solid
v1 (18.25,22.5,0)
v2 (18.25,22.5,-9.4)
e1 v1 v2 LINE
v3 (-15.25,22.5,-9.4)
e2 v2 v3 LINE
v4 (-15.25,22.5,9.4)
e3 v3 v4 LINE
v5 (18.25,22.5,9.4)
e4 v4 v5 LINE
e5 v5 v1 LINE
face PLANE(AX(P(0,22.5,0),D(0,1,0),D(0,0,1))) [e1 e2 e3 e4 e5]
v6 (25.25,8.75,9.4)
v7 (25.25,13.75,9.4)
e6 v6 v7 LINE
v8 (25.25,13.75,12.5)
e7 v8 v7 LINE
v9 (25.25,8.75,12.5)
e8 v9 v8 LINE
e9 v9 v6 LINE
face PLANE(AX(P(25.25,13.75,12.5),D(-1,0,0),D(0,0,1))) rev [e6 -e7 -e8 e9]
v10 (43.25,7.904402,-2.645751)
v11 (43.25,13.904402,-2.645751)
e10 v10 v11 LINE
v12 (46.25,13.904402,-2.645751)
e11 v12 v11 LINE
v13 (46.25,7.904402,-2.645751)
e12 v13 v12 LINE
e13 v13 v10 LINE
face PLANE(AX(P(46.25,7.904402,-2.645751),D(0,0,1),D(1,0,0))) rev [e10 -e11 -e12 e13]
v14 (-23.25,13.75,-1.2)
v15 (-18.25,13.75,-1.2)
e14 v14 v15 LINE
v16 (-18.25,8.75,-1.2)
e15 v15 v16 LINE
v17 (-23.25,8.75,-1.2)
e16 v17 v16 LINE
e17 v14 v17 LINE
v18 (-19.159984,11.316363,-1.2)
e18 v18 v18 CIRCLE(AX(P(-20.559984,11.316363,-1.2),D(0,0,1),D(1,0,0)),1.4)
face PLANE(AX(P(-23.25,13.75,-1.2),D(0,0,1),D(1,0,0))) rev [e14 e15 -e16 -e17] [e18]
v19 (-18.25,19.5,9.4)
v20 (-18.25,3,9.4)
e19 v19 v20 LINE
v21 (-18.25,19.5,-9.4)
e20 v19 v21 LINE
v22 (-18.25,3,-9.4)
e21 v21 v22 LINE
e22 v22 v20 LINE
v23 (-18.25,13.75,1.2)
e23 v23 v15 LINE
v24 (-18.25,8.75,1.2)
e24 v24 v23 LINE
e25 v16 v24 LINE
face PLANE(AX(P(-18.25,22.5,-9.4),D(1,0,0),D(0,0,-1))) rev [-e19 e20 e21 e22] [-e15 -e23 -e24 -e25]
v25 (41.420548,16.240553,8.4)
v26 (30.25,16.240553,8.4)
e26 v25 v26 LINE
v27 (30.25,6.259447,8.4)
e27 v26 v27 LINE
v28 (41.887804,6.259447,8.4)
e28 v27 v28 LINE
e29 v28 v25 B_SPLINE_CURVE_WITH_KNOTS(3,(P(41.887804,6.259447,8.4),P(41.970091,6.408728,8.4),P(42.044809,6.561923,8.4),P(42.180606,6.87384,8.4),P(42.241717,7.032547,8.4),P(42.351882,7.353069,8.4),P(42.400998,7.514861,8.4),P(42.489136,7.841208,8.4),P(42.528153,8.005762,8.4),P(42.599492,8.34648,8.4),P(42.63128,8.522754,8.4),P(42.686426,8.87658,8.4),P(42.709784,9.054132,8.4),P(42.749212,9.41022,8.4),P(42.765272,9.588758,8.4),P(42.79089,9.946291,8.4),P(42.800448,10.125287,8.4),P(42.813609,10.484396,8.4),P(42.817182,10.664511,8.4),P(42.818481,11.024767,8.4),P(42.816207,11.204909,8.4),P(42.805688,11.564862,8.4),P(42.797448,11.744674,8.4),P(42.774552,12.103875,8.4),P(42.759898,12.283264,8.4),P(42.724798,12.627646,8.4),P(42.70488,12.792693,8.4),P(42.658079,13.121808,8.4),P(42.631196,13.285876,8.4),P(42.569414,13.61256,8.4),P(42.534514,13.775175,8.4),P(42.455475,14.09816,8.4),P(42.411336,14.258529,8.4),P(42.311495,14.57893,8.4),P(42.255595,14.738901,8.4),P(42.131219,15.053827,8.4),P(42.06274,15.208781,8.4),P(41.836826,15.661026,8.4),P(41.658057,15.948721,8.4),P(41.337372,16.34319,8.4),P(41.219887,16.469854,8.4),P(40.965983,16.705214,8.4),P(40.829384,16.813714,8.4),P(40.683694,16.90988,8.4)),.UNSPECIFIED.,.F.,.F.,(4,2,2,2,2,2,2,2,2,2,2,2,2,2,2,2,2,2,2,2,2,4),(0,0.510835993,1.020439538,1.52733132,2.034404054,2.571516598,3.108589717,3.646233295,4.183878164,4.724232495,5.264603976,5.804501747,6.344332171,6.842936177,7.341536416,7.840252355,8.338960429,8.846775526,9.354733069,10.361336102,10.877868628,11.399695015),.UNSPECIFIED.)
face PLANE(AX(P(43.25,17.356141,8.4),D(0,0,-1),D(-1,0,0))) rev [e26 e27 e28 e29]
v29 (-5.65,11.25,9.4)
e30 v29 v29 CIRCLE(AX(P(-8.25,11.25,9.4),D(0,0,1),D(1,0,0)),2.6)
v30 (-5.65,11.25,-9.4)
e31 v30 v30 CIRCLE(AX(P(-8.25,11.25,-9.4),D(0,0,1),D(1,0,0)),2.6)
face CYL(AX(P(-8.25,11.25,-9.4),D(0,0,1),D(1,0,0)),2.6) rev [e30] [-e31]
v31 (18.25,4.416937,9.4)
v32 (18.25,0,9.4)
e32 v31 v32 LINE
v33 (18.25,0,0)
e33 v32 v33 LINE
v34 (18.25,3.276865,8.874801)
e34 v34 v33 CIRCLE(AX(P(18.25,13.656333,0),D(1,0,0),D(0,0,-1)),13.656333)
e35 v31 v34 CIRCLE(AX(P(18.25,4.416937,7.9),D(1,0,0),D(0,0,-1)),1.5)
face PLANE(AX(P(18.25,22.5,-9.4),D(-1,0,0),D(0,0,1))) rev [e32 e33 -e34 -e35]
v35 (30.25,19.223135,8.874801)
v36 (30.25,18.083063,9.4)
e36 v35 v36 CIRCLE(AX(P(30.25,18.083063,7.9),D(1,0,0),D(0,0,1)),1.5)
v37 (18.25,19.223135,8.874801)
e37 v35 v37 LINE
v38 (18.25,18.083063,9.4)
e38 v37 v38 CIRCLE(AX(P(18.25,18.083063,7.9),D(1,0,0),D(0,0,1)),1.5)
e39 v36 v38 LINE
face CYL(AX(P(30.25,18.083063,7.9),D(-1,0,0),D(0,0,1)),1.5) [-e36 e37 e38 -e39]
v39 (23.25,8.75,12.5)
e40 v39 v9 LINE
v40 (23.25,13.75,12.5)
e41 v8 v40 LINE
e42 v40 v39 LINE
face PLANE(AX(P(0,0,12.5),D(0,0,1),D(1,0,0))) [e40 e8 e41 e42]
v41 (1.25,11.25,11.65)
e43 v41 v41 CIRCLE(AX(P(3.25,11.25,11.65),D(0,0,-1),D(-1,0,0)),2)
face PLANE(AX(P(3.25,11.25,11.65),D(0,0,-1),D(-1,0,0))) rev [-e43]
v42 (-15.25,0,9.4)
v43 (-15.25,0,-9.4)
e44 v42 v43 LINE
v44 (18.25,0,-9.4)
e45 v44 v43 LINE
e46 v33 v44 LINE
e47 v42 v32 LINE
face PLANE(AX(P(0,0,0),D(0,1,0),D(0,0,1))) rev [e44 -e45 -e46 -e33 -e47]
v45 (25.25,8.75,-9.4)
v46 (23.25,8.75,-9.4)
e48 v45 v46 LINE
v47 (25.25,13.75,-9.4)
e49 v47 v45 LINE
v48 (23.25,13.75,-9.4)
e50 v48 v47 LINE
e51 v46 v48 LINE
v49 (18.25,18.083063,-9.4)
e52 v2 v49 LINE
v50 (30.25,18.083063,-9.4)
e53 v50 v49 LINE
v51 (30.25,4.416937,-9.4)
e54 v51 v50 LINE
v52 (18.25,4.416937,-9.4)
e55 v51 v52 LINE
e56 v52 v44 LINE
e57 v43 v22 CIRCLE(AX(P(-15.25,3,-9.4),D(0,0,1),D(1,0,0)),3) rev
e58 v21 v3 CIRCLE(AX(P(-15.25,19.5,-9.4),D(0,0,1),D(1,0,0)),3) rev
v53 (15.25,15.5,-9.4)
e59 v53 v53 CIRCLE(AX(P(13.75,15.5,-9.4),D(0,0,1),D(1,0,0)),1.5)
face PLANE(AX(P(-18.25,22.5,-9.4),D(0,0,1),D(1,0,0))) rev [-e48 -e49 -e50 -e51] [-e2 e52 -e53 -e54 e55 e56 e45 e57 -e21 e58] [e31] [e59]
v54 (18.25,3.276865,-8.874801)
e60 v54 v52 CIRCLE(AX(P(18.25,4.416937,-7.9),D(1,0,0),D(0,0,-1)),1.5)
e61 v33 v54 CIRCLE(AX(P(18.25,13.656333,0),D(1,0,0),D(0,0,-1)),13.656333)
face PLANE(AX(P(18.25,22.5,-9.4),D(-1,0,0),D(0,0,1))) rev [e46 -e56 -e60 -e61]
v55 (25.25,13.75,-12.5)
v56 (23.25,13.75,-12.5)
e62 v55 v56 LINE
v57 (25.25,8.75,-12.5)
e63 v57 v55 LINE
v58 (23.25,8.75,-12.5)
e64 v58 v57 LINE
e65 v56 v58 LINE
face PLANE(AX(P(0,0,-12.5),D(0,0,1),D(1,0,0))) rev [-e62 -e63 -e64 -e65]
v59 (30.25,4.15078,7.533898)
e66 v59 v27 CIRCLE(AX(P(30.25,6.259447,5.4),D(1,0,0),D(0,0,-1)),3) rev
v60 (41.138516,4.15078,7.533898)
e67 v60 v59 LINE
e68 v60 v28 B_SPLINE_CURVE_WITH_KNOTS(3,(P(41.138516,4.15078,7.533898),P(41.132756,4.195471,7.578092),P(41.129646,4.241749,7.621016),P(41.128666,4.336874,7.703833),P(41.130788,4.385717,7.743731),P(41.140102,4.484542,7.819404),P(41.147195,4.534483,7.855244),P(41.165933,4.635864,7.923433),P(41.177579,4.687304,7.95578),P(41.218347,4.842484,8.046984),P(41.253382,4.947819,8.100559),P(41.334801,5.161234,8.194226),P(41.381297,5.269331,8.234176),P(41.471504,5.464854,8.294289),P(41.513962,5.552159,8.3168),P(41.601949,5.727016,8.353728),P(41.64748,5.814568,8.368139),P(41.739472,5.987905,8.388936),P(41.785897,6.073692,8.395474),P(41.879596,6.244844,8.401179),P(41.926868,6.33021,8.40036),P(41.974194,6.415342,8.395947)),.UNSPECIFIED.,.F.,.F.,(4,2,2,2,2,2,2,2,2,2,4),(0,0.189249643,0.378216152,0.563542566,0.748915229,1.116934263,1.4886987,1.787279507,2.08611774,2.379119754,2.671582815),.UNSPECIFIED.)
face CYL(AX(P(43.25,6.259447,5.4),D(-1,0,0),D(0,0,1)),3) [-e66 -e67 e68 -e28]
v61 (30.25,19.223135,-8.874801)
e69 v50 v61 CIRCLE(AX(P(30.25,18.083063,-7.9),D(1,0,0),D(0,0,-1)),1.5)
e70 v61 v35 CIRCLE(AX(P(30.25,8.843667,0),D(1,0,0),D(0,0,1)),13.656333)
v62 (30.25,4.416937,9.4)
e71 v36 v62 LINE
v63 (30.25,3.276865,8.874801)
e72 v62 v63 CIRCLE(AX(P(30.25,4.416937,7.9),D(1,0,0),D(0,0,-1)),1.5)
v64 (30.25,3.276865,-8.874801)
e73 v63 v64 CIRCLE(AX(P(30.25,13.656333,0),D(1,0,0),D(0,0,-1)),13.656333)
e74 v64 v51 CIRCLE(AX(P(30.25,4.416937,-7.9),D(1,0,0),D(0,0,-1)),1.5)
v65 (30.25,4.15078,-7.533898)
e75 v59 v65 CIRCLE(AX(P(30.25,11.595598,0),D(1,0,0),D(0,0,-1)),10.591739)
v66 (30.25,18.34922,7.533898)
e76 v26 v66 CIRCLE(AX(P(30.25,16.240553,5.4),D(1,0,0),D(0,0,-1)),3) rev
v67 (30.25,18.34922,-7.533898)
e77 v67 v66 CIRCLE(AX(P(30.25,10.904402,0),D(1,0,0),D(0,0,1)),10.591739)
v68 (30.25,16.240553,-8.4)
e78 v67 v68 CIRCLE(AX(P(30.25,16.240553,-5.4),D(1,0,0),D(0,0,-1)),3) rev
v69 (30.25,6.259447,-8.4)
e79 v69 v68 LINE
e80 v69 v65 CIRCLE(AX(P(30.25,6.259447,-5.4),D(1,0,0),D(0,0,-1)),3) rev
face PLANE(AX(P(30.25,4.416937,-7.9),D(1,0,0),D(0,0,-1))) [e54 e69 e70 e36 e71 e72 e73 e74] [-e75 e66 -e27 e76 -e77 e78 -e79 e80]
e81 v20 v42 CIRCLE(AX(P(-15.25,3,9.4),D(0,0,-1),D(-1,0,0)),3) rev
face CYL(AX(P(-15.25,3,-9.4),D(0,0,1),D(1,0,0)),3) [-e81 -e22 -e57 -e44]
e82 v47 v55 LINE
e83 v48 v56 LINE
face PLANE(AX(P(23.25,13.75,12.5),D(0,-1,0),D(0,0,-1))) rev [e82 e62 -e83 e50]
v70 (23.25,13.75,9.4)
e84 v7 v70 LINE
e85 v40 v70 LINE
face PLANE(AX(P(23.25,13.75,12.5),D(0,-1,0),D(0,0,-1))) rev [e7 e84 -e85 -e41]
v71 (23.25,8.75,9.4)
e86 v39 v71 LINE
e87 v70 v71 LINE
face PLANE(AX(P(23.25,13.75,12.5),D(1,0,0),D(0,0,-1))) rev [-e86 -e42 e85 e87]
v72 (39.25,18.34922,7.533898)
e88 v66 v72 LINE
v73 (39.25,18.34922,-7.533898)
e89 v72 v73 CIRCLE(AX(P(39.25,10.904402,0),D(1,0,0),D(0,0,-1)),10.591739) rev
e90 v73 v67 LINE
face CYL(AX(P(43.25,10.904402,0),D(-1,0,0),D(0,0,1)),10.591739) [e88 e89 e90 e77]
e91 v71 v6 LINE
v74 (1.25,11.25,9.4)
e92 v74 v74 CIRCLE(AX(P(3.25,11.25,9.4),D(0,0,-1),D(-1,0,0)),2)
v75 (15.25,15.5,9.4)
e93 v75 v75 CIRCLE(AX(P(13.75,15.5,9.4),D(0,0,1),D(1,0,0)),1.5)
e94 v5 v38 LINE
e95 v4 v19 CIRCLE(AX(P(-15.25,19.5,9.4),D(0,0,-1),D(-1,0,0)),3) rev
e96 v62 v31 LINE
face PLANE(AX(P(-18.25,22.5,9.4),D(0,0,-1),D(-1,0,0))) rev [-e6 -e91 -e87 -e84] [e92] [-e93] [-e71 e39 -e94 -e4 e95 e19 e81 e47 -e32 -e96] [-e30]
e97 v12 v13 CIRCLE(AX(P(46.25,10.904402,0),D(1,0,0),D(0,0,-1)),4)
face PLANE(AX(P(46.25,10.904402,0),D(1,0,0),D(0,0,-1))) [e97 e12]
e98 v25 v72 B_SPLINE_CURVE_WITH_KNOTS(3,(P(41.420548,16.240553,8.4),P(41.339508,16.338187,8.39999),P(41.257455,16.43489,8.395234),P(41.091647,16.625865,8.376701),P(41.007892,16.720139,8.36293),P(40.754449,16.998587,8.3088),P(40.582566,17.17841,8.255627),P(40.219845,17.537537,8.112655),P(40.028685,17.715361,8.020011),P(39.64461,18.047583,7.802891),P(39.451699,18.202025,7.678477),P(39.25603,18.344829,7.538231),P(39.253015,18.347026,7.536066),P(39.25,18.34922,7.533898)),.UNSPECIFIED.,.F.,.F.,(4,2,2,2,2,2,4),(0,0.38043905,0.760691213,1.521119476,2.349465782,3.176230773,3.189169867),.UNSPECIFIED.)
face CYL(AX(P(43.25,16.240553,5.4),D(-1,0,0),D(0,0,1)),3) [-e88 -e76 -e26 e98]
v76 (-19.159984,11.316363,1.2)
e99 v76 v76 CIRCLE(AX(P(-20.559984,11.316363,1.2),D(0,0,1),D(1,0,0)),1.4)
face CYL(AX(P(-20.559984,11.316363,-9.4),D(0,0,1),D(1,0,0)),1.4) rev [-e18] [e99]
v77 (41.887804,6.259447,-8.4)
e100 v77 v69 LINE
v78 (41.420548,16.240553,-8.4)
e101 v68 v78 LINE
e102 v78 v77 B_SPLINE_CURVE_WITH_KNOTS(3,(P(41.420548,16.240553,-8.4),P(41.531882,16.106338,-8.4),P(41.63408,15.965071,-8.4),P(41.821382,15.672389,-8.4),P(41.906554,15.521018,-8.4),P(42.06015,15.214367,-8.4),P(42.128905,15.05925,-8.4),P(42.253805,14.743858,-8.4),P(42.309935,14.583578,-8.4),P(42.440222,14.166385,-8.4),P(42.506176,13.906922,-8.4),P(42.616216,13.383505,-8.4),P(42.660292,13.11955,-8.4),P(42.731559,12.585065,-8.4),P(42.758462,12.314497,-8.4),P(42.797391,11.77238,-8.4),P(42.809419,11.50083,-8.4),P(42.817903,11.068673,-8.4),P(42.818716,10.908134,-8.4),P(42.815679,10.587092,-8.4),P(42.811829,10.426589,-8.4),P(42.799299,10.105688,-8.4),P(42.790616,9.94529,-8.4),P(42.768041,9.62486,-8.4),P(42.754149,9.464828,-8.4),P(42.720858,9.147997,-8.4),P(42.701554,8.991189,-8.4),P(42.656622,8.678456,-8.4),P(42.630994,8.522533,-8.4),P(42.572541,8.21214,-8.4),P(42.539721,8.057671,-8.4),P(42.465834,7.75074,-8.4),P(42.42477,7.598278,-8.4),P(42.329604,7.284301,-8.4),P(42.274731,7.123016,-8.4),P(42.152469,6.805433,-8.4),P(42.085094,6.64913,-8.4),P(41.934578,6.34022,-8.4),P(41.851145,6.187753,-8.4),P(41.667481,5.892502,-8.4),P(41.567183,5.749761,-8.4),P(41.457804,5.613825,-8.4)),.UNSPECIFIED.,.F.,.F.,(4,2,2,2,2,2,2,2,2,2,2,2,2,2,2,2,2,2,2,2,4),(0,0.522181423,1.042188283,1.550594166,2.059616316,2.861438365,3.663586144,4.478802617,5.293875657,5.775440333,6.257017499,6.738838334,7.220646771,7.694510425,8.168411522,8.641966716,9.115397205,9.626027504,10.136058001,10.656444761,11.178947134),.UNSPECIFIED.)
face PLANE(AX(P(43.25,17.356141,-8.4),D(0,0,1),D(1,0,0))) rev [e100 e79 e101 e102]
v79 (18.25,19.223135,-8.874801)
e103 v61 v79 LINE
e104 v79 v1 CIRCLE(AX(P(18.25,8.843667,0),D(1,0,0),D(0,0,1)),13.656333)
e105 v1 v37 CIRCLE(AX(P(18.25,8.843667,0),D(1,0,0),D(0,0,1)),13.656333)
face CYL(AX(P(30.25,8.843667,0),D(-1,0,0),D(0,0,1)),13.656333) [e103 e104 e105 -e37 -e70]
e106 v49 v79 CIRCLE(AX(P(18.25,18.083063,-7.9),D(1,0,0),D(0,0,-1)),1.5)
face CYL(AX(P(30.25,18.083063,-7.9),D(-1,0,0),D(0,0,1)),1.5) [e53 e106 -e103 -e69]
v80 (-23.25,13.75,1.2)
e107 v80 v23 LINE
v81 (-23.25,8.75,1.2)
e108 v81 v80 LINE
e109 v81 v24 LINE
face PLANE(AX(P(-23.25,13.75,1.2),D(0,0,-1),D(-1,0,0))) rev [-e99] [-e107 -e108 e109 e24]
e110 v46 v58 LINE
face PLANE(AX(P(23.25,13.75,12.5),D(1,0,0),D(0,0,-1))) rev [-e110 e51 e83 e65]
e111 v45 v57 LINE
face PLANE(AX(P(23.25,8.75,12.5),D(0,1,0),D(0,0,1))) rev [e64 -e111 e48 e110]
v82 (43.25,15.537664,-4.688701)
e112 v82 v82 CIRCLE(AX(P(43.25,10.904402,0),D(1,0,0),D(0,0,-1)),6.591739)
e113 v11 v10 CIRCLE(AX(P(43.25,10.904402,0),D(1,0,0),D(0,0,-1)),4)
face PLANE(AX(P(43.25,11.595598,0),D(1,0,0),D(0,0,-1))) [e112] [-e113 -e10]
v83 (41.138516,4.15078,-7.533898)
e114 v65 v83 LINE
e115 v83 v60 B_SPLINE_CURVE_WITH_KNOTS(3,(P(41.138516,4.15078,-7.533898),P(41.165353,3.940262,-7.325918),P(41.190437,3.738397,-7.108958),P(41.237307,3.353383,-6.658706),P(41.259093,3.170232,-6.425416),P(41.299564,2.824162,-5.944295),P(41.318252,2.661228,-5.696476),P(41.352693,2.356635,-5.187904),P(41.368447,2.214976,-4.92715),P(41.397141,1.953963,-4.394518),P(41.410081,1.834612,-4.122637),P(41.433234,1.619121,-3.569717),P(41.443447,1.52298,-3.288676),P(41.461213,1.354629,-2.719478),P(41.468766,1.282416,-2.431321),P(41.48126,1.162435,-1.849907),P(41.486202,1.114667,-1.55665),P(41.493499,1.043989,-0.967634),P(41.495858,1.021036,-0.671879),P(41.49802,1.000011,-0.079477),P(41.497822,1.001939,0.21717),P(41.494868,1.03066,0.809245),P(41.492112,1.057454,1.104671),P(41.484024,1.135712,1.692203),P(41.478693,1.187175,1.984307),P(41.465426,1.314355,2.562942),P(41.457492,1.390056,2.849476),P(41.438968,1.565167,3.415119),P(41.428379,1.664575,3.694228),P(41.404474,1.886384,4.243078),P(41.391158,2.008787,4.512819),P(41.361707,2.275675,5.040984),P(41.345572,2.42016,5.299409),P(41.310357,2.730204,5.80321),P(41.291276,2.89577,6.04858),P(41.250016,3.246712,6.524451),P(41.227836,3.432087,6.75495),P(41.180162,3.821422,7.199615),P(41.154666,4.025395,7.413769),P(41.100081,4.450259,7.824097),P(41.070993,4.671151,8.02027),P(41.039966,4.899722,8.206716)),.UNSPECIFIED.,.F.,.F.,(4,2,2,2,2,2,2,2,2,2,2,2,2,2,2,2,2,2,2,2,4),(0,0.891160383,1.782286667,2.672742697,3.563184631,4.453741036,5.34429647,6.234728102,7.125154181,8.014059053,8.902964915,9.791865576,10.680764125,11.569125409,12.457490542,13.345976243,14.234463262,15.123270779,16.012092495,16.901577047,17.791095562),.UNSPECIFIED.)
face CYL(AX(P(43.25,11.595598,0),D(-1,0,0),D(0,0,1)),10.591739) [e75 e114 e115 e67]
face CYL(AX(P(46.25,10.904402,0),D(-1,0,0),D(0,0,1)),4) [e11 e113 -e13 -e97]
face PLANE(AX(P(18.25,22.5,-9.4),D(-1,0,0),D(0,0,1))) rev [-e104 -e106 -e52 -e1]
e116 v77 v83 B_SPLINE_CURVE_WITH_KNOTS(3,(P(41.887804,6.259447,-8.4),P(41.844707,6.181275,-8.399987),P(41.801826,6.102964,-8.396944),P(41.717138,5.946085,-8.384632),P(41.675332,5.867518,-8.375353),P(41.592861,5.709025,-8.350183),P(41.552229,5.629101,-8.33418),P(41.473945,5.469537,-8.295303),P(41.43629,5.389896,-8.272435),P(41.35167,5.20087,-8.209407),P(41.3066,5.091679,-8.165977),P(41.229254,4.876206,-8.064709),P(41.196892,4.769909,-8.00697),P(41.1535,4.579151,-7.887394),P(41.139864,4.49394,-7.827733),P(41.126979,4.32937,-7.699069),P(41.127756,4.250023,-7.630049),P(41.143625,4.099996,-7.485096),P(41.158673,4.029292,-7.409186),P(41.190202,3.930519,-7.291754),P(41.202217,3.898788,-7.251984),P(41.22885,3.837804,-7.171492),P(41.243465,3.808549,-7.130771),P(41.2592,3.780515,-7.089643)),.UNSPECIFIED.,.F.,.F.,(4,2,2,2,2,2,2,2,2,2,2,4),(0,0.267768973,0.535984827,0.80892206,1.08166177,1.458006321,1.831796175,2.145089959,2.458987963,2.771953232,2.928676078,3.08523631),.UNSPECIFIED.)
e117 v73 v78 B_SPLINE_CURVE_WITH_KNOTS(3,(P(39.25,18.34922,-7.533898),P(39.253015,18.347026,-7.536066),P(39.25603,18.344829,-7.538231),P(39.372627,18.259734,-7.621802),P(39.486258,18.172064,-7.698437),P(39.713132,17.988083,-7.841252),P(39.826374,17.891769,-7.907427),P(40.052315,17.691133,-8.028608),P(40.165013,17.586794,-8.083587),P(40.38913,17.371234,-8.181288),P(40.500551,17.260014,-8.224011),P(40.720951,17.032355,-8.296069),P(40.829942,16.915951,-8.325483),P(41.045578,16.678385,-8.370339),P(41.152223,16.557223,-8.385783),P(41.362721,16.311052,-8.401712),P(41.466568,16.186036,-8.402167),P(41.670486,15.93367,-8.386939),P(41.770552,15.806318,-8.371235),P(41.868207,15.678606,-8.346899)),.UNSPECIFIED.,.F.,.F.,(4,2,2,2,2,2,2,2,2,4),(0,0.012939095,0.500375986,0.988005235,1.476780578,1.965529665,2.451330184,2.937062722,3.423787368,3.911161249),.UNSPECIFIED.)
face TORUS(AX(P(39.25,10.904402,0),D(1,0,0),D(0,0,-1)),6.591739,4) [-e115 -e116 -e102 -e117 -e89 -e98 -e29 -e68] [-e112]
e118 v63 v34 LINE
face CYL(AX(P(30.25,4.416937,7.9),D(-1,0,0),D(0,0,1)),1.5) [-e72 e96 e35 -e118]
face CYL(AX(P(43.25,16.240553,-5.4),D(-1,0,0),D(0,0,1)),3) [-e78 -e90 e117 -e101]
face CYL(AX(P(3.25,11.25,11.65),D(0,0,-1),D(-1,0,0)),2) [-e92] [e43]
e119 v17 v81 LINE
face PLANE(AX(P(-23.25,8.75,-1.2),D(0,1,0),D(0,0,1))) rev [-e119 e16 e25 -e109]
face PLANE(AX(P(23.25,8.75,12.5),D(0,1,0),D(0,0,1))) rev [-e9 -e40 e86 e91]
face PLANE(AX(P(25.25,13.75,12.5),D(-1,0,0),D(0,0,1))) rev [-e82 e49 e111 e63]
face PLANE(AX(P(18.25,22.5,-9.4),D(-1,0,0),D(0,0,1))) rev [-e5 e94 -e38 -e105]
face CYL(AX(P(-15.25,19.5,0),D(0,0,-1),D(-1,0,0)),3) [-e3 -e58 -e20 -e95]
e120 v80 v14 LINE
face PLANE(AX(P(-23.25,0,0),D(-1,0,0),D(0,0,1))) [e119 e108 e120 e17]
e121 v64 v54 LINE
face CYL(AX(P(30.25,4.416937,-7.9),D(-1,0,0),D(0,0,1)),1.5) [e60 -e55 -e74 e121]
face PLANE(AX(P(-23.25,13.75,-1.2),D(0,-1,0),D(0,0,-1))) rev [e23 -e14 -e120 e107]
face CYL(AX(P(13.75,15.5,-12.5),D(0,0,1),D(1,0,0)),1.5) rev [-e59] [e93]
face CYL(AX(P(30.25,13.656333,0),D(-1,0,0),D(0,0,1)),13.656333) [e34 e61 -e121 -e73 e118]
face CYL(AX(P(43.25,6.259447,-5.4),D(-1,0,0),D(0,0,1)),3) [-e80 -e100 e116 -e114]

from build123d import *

# Parameters (mm, degrees)
SKETCH_1_W          = 36.5
SKETCH_1_H          = 18.8
EXTRUDE_1_DEPTH     = 22.5
FILLET_1_R          = 3
SKETCH_2_R          = 2.6
CUT_EXTRUDE_1_DEPTH = 35.536249073
SKETCH_3_W          = 2.4
SKETCH_3_H          = 5
EXTRUDE_2_DEPTH     = 5
SKETCH_4_R          = 1.4
CUT_EXTRUDE_2_DEPTH = 35.046622446
EXTRUDE_3_DEPTH     = 12
EXTRUDE_4_DEPTH     = 13
FILLET_2_R          = 3
EXTRUDE_5_DEPTH     = 3
SKETCH_9_R          = 2
EXTRUDE_7_DEPTH     = 21.05
SKETCH_10_W         = 2
SKETCH_10_H         = 5
EXTRUDE_8_DEPTH     = 12.5
SKETCH_11_R         = 1.5
CUT_EXTRUDE_3_DEPTH = 56.901006252


with BuildPart() as part:
    # 草图1 → 凸台-拉伸1 (new body)
    with BuildSketch(Plane(origin=(0, 0, 0), x_dir=(1, 0, 0), z_dir=(0, 1, 0))):
        Rectangle(SKETCH_1_W, SKETCH_1_H)
    extrude(amount=EXTRUDE_1_DEPTH)

    # 圆角1
    fillet_1_edges = [part.edges().sort_by_distance(p)[0] for p in [
        (-18.25, 22.5, 0),
        (-18.25, 0, 0),
    ]]
    fillet(fillet_1_edges, radius=FILLET_1_R)

    # 草图2 → 切除-拉伸1 (cut, through all)
    with BuildSketch(Plane.XY.offset(9.4)):
        with Locations((-8.25, 11.25)):
            Circle(SKETCH_2_R)
    extrude(amount=-CUT_EXTRUDE_1_DEPTH, mode=Mode.SUBTRACT)

    # 草图3 → 凸台-拉伸2 (add)
    with BuildSketch(Plane.ZY.offset(18.25)):
        with Locations((0, 11.25)):
            Rectangle(SKETCH_3_W, SKETCH_3_H)
    extrude(amount=EXTRUDE_2_DEPTH)

    # 草图4 → 切除-拉伸2 (cut, through all)
    with BuildSketch(Plane.XY.offset(1.2)):
        with Locations((-20.559983935, 11.316362833)):
            Circle(SKETCH_4_R)
    extrude(amount=-CUT_EXTRUDE_2_DEPTH, mode=Mode.SUBTRACT)

    # 草图5 → 凸台-拉伸3 (add)
    with BuildSketch(Plane(origin=(18.25, 0, 0), x_dir=(0, 0, -1), z_dir=(1, 0, 0))):
        with BuildLine():
            Line((-9.4, 18.083062757), (-9.4, 4.416937243))
            ThreePointArc((-9.4, 4.416937243), (-9.262387752, 3.78932302), (-8.874800516, 3.276865335))
            ThreePointArc((-8.874800516, 3.276865335), (0, 0), (8.874800516, 3.276865335))
            ThreePointArc((8.874800516, 3.276865335), (9.262387752, 3.78932302), (9.4, 4.416937243))
            Line((9.4, 4.416937243), (9.4, 18.083062757))
            ThreePointArc((9.4, 18.083062757), (9.262387752, 18.71067698), (8.874800516, 19.223134665))
            ThreePointArc((8.874800516, 19.223134665), (0, 22.5), (-8.874800516, 19.223134665))
            ThreePointArc((-8.874800516, 19.223134665), (-9.262387752, 18.71067698), (-9.4, 18.083062757))
        make_face()
    extrude(amount=EXTRUDE_3_DEPTH)

    # 草图6 → 凸台-拉伸4 (add)
    with BuildSketch(Plane(origin=(30.25, 0, 0), x_dir=(0, 0, -1), z_dir=(1, 0, 0))):
        with BuildLine():
            Line((-8.4, 17.356141187), (-8.4, 5.143858813))
            ThreePointArc((-8.4, 5.143858813), (0, 1.003858813), (8.4, 5.143858813))
            Line((8.4, 5.143858813), (8.4, 17.356141187))
            ThreePointArc((8.4, 17.356141187), (0, 21.496141187), (-8.4, 17.356141187))
        make_face()
    extrude(amount=EXTRUDE_4_DEPTH)

    # 圆角2
    fillet_2_edges = [part.edges().sort_by_distance(p)[0] for p in [
        (36.75, 5.143858813, 8.4),
        (36.75, 5.143858813, -8.4),
        (36.75, 17.356141187, -8.4),
        (36.75, 17.356141187, 8.4),
    ]]
    fillet(fillet_2_edges, radius=FILLET_2_R)

    # 圆角3: read off the stored shape, not the designer's step
    # 圆角3 outline → 圆角3 (revolve, cut)
    with BuildSketch(Plane(origin=(0, 10.904402057, 0), x_dir=(0, 1, 0), z_dir=(0, 0, -1))):
        with BuildLine():
            ThreePointArc((6.59173913, 43.25), (9.420166255, 42.078427125), (10.59173913, 39.25))
            Line((10.59173913, 39.25), (10.59173913, 43.25))
            Line((10.59173913, 43.25), (6.59173913, 43.25))
        make_face()
    revolve(axis=Axis((0, 10.904402057, 0), (1, 0, 0)), mode=Mode.SUBTRACT)

    # 草图7 → 凸台-拉伸5 (add)
    with BuildSketch(Plane(origin=(43.25, 0, 0), x_dir=(0, 0, -1), z_dir=(1, 0, 0))):
        with BuildLine():
            Line((2.645751311, 7.904402057), (2.645751311, 13.904402057))
            ThreePointArc((2.645751311, 13.904402057), (-4, 10.904402057), (2.645751311, 7.904402057))
        make_face()
    extrude(amount=EXTRUDE_5_DEPTH)

    # 草图9 → 凸台-拉伸7 (add)
    with BuildSketch(Plane(origin=(0, 0, -9.4), x_dir=(-1, 0, 0), z_dir=(0, 0, -1))):
        with Locations((-3.25, 11.25)):
            Circle(SKETCH_9_R)
    extrude(amount=-EXTRUDE_7_DEPTH)

    # 草图10 → 凸台-拉伸8 (add, symmetric)
    with BuildSketch(Plane.XY):
        with Locations((24.25, 11.25)):
            Rectangle(SKETCH_10_W, SKETCH_10_H)
    extrude(amount=EXTRUDE_8_DEPTH, both=True)

    # 草图11 → 切除-拉伸3 (cut, through all)
    with BuildSketch(Plane.XY.offset(9.4)):
        with Locations((13.75, 15.5)):
            Circle(SKETCH_11_R)
    extrude(amount=-CUT_EXTRUDE_3_DEPTH, mode=Mode.SUBTRACT)


solid = part.part
